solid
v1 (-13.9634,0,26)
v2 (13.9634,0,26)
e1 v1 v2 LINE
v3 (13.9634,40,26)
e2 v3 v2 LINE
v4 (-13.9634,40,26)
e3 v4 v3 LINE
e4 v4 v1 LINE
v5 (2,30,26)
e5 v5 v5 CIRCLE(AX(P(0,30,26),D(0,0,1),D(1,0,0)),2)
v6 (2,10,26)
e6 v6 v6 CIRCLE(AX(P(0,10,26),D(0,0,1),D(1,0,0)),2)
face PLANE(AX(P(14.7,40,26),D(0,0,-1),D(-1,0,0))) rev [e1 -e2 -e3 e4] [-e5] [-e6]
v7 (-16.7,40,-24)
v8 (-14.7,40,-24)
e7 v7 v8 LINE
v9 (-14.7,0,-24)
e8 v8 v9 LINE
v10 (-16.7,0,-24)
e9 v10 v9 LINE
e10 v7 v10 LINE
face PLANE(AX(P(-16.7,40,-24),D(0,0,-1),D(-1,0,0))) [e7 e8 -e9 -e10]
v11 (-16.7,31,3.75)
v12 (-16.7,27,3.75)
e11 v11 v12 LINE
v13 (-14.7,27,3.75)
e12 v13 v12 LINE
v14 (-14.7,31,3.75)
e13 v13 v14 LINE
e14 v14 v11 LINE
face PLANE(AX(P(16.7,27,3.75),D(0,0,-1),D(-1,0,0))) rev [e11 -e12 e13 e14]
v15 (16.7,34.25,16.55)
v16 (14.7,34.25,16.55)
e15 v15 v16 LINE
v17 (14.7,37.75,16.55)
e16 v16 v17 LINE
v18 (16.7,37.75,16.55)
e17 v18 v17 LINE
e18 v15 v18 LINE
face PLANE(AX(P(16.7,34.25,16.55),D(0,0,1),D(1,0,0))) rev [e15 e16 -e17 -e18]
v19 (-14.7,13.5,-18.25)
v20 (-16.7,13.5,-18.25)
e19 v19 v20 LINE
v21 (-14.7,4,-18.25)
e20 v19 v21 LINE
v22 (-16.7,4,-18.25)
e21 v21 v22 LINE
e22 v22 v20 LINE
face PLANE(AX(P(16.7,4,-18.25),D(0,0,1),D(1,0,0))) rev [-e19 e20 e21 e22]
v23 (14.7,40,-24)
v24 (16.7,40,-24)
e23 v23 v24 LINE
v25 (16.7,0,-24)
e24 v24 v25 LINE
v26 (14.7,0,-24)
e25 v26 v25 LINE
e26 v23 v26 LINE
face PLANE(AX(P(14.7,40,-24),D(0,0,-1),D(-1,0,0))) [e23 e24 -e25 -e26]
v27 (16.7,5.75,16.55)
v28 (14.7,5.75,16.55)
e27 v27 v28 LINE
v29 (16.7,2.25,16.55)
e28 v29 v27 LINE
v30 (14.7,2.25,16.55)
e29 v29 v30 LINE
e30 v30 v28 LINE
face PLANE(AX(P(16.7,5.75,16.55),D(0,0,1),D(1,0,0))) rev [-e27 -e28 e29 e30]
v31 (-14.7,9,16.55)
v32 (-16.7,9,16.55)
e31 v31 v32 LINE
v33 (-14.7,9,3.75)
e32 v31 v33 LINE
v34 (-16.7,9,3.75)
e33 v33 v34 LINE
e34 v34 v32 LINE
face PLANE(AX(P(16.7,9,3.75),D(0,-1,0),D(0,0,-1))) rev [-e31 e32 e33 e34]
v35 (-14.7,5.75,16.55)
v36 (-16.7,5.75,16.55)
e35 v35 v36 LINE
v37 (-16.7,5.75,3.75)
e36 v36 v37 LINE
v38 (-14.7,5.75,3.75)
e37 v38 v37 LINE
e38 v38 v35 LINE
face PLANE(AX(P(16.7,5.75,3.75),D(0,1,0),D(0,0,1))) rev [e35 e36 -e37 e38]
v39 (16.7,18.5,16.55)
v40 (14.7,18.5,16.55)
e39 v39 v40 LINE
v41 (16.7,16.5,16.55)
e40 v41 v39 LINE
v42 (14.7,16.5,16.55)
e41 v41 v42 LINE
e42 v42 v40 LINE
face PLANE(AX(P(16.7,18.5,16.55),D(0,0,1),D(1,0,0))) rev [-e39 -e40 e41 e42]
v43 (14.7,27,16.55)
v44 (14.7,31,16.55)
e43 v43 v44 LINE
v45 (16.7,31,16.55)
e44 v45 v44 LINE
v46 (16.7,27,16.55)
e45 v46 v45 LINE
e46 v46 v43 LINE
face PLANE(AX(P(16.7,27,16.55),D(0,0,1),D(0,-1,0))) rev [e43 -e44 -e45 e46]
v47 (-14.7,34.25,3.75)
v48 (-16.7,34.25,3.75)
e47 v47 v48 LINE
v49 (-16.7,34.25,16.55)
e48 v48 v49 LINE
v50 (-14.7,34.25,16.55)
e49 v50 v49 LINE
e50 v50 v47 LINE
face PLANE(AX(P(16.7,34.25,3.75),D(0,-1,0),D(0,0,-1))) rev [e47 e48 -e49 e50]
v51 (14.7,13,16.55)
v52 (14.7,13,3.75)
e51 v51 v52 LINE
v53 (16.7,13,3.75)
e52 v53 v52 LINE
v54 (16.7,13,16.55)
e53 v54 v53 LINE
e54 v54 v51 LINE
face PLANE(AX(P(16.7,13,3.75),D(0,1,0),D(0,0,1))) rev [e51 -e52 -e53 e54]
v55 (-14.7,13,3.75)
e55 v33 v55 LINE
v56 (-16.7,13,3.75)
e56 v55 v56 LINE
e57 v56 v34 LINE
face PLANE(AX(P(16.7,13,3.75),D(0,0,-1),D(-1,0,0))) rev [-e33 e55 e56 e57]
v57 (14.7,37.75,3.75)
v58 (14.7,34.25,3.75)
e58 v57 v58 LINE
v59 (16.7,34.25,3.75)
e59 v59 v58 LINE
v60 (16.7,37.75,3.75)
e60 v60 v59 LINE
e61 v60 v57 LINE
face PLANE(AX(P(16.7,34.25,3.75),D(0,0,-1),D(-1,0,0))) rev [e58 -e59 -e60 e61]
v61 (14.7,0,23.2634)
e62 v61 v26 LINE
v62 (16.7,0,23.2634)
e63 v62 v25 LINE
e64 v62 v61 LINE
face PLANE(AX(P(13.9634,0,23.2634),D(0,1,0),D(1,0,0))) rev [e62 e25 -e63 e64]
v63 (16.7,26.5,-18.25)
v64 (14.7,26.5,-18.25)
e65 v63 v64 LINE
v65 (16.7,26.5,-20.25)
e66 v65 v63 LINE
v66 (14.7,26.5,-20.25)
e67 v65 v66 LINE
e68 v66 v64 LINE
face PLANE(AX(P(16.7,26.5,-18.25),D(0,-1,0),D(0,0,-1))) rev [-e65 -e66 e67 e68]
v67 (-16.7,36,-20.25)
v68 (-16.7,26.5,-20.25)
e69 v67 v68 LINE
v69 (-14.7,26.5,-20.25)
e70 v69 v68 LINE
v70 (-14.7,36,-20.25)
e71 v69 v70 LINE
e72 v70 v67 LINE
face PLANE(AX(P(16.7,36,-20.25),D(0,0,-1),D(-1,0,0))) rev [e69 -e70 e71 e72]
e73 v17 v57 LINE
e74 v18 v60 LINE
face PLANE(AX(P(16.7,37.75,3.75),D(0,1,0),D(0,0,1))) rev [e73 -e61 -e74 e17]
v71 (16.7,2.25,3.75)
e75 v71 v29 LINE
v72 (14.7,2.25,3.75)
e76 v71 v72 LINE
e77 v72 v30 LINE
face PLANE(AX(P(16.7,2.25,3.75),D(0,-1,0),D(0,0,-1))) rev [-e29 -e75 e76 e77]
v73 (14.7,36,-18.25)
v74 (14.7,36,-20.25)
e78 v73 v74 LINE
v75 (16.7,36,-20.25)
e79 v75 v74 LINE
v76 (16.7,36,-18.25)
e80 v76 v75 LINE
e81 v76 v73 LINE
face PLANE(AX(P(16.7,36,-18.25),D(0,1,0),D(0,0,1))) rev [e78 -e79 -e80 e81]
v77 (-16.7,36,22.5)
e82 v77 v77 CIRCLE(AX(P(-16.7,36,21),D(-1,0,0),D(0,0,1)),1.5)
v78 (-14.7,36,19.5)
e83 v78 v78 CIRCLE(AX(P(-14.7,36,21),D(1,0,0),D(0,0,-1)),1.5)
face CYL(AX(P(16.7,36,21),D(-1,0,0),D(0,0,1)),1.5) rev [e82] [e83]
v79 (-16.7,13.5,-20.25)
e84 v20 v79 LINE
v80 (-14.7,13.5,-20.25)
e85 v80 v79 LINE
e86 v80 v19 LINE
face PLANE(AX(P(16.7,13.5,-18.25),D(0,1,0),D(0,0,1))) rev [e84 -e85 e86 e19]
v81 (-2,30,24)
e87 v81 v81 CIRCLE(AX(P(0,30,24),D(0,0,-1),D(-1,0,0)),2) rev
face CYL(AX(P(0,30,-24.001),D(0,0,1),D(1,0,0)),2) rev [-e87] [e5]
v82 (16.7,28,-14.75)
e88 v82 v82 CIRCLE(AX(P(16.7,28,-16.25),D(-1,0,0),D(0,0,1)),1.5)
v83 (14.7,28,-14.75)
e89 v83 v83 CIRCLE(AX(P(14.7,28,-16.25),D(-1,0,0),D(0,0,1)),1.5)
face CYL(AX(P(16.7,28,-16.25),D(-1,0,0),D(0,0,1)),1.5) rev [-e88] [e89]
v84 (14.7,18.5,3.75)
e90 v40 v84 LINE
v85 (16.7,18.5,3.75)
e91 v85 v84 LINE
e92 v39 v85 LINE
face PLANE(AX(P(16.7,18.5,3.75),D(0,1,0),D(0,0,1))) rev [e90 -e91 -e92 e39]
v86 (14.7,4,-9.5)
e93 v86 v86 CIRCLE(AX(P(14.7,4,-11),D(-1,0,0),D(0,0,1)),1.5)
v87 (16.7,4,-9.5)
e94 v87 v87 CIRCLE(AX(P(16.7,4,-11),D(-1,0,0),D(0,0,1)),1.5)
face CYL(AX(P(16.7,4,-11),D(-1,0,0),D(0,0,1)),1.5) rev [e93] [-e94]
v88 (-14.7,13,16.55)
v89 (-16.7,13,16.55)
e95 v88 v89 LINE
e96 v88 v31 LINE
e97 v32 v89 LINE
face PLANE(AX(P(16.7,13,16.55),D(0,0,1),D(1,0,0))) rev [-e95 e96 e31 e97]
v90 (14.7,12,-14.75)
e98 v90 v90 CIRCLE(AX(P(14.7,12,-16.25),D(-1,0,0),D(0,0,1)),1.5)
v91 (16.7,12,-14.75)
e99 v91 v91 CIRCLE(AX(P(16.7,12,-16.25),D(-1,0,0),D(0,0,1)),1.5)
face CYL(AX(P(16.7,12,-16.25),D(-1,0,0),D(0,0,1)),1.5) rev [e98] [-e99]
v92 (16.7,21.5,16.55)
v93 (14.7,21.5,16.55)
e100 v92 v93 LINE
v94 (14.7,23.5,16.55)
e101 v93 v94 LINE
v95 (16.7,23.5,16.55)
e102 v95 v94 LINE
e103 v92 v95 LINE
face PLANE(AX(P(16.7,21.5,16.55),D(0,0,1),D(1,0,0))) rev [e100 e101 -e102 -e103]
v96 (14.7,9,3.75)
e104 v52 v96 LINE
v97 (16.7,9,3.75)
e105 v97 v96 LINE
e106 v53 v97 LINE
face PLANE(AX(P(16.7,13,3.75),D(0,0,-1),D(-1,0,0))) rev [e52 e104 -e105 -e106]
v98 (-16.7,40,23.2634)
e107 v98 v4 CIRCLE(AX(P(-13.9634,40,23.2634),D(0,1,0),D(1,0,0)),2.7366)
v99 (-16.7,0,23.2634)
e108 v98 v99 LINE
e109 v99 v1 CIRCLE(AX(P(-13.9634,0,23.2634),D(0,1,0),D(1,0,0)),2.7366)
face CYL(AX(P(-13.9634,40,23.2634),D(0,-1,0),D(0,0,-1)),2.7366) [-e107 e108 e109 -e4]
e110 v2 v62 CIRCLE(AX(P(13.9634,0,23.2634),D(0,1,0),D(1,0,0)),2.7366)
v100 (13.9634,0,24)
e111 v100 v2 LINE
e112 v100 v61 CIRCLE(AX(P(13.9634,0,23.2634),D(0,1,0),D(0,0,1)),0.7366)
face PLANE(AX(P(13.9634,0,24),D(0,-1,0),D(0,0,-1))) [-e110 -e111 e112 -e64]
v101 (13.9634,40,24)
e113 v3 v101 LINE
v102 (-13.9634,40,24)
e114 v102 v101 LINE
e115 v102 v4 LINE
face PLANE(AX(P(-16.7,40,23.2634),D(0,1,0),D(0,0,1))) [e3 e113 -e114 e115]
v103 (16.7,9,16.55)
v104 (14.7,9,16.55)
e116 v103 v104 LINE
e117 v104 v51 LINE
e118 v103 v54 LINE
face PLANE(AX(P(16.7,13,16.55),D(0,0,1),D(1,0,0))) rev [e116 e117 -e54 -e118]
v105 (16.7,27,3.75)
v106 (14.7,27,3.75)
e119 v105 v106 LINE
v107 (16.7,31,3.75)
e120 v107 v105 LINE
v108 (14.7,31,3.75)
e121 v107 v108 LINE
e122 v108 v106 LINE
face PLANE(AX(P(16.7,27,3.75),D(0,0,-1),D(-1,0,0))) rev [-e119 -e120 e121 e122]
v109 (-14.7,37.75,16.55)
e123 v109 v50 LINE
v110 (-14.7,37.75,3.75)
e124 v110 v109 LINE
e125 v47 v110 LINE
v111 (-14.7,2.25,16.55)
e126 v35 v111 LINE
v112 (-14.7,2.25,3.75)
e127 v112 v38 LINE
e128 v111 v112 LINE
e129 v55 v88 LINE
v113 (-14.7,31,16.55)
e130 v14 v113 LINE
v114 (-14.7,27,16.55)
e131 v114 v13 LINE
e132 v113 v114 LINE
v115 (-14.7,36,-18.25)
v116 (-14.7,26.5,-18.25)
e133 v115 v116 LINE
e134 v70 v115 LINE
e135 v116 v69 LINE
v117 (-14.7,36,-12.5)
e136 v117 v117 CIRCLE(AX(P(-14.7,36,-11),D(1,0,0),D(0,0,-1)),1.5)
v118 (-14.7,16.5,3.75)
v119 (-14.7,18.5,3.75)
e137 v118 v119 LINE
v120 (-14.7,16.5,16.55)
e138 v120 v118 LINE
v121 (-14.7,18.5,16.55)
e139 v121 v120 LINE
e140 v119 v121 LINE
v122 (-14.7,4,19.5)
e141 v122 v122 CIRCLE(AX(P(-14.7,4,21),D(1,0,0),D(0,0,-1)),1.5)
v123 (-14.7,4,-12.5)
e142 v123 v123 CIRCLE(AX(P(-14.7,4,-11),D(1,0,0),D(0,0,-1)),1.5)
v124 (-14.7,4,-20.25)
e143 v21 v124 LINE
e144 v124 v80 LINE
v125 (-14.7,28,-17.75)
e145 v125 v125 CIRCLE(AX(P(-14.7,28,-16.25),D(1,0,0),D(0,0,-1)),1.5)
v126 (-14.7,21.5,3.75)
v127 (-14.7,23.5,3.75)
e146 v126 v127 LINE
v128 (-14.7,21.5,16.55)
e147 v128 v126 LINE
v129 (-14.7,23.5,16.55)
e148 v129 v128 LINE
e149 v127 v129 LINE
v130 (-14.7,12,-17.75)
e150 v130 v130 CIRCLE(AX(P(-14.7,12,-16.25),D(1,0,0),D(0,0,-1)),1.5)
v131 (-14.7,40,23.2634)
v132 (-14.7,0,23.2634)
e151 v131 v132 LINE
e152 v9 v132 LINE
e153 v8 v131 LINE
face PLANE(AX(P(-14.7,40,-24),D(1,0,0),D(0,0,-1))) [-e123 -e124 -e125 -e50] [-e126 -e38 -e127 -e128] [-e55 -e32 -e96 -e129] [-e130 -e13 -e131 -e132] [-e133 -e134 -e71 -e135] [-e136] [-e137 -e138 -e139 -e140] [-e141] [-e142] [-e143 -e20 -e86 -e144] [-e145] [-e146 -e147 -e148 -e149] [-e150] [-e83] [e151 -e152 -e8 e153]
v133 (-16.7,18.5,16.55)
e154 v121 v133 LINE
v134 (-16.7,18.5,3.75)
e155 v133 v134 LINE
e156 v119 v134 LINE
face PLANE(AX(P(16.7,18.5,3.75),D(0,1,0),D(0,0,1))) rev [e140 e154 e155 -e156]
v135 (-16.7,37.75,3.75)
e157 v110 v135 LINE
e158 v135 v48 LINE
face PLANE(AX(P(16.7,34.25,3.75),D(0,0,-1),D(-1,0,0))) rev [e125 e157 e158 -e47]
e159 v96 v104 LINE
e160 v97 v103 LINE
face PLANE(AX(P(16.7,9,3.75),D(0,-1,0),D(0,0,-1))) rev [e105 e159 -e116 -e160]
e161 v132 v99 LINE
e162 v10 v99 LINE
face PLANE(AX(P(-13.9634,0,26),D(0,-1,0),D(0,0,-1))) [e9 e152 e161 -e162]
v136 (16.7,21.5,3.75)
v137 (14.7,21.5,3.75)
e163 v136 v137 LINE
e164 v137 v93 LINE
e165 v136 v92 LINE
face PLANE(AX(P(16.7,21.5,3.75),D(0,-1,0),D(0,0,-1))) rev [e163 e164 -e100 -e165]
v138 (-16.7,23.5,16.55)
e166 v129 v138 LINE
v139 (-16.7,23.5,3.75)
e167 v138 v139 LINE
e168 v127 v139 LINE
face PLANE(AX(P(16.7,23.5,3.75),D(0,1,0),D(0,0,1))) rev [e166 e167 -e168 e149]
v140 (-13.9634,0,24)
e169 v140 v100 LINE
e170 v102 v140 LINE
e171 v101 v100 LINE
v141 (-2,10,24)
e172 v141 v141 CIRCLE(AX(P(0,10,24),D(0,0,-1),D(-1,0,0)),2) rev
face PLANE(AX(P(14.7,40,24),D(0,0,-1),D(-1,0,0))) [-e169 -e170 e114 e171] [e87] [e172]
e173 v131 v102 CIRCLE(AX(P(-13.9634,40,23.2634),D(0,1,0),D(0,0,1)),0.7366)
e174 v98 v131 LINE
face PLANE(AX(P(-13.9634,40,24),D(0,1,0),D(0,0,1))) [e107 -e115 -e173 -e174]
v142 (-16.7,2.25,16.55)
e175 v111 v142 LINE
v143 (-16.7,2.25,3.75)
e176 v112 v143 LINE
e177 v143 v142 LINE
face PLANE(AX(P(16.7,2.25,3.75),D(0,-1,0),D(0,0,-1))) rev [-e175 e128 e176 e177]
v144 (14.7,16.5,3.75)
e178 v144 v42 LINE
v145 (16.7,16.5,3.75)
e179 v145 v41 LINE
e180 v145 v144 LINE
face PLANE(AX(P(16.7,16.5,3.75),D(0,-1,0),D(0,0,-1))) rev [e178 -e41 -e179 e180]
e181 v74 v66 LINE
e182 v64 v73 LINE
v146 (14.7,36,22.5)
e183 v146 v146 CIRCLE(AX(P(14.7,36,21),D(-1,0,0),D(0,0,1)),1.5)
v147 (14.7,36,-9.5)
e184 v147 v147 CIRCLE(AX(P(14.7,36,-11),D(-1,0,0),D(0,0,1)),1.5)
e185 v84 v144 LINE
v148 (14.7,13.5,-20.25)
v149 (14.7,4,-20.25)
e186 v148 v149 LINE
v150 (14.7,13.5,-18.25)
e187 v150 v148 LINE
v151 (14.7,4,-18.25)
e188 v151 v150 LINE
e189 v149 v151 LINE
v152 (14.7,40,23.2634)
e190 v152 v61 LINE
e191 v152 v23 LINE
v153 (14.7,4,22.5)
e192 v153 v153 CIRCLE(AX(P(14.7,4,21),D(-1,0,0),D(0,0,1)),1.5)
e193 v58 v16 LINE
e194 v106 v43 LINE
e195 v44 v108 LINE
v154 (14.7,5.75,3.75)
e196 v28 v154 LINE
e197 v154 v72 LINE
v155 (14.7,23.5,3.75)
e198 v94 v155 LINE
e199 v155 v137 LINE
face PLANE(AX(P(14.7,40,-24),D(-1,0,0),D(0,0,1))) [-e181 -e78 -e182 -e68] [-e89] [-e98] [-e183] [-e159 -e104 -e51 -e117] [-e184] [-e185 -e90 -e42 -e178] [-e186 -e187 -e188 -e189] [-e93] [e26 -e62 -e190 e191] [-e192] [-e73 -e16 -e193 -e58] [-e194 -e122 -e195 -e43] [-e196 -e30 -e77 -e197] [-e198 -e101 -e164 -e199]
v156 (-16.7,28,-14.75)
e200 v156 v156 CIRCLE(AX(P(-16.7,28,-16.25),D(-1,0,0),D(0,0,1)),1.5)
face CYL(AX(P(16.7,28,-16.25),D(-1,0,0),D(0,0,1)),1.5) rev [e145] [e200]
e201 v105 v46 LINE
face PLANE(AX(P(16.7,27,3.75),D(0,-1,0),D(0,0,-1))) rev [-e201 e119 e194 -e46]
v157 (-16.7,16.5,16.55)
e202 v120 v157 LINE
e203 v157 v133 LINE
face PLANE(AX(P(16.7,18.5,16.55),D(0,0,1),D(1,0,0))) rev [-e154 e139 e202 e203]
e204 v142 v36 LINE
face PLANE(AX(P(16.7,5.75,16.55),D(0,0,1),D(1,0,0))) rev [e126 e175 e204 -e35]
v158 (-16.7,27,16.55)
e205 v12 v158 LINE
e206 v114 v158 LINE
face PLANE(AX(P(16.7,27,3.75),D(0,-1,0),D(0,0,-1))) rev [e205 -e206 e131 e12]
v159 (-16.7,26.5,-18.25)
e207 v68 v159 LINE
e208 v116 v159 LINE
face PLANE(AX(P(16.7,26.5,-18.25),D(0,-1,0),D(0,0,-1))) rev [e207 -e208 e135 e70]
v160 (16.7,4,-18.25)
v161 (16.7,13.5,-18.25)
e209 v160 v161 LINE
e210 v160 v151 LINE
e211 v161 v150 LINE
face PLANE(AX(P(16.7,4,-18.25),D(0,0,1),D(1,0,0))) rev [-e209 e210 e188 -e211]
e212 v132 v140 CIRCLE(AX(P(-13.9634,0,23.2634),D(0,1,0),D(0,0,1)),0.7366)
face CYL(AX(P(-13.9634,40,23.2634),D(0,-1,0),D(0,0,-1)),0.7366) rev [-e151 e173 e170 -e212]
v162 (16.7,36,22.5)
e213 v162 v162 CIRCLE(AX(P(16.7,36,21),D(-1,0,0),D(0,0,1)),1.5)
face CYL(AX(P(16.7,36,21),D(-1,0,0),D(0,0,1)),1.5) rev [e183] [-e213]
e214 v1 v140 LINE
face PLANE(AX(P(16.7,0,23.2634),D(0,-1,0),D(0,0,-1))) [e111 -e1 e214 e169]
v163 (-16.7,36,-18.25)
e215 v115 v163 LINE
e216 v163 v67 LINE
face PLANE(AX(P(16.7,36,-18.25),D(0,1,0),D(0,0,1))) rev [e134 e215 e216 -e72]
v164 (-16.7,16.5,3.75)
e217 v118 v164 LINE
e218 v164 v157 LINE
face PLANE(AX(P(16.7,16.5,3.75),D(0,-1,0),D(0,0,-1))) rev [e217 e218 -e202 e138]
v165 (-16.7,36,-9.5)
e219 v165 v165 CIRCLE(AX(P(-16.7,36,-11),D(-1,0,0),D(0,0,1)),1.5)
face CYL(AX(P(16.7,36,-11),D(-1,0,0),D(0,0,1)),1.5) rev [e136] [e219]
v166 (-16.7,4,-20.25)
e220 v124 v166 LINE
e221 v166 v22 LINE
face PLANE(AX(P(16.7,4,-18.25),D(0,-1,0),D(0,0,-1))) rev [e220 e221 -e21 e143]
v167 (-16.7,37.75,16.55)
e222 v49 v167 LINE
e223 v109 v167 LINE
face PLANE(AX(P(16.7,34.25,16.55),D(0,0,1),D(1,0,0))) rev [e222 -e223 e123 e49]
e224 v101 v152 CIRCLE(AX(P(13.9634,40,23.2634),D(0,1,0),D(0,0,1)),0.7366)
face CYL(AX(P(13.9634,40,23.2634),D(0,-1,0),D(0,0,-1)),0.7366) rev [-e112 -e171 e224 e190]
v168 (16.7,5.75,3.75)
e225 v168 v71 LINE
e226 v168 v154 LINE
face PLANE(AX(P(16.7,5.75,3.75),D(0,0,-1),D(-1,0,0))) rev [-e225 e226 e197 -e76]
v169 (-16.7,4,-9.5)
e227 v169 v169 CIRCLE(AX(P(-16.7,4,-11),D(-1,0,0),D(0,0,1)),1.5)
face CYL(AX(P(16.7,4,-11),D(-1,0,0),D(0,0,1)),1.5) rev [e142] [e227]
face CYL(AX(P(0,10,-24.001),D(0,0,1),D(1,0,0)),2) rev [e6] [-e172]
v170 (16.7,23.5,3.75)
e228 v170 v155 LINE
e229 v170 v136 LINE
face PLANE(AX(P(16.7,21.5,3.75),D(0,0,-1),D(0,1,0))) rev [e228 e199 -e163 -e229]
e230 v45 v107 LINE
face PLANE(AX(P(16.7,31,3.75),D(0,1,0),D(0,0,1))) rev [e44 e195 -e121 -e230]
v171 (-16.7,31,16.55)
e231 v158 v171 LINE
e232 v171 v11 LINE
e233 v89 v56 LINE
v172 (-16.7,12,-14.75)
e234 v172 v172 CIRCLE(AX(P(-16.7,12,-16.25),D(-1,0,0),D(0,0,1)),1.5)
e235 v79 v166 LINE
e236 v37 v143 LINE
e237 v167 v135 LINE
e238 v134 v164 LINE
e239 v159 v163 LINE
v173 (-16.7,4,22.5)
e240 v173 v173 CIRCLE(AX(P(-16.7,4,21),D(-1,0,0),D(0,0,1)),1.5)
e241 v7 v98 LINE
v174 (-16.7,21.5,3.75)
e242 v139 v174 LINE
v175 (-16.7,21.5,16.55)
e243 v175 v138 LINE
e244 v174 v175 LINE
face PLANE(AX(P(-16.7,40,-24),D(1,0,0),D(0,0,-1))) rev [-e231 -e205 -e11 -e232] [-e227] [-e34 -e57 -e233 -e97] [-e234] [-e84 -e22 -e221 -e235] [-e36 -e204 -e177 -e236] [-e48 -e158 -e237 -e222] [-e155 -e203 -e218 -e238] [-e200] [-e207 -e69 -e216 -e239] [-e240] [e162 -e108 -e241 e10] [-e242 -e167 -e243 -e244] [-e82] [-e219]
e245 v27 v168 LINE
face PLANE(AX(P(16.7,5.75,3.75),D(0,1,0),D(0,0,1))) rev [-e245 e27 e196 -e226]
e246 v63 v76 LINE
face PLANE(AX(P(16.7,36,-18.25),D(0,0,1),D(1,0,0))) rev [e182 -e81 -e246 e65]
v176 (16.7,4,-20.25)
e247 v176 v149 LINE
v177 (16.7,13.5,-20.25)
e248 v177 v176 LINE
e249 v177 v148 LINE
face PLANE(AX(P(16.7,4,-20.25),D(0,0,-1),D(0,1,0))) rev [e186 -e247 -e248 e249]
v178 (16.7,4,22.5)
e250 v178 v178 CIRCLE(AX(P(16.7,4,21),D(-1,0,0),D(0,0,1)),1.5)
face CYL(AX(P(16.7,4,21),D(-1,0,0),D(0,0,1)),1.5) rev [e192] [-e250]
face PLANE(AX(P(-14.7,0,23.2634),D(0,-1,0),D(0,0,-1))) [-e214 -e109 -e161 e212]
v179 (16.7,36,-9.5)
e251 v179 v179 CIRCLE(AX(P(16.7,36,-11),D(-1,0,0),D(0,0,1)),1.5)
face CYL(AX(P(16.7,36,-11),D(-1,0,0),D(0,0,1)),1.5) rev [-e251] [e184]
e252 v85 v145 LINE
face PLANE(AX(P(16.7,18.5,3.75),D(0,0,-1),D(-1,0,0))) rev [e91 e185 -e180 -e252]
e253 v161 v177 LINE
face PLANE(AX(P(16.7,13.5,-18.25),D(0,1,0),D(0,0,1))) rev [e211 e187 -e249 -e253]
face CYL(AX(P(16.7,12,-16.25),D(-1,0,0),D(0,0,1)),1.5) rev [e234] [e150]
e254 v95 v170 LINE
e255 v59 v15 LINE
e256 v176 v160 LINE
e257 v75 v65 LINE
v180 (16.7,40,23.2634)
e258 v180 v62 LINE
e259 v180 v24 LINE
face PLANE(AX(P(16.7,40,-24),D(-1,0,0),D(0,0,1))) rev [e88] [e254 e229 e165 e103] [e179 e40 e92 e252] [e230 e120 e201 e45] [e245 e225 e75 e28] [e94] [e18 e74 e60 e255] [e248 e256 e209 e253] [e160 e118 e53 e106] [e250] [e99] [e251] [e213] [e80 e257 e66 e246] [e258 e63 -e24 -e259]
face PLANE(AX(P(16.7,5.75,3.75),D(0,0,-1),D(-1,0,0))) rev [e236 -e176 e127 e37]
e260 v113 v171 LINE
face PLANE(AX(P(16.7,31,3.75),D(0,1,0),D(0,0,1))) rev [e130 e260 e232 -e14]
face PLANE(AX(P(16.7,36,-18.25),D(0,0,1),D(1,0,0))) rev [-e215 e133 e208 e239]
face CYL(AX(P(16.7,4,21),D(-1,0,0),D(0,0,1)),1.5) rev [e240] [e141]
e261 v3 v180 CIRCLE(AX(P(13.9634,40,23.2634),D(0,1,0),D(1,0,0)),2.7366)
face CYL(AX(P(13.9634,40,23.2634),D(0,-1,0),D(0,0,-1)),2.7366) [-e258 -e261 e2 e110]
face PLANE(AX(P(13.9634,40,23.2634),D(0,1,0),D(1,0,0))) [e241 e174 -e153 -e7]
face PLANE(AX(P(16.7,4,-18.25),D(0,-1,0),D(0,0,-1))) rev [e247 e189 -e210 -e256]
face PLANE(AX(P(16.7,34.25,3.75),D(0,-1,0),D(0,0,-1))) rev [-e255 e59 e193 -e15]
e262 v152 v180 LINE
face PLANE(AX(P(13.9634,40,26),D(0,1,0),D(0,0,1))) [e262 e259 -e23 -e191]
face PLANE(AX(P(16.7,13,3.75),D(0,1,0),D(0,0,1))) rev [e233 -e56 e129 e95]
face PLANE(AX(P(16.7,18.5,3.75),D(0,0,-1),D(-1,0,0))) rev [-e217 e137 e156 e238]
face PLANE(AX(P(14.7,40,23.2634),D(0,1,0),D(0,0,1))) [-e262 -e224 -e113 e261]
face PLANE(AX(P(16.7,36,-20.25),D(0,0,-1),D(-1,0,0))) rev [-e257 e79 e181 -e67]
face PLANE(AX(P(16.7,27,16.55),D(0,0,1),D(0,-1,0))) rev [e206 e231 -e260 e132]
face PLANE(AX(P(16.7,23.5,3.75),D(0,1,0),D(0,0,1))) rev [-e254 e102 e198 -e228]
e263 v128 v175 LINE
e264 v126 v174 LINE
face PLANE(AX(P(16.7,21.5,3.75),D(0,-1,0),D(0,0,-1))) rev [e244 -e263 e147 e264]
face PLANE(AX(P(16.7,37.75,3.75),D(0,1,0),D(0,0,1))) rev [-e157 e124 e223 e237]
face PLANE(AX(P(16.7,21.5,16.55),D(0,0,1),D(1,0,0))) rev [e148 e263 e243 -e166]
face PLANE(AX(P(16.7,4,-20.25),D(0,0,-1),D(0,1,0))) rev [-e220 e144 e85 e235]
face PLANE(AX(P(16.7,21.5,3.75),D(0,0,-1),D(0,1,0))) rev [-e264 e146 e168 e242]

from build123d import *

# Parameters (mm, degrees)
BASE_FLANGE1_DEPTH = 40
SKETCH2_R          = 1.5
SKETCH2_W          = 12.8
SKETCH2_H          = 3.5
SKETCH2_H_2        = 2
SKETCH2_H_3        = 4
SKETCH2_W_2        = 2
SKETCH2_H_4        = 9.5
CUT_EXTRUDE1_DEPTH = 33.4
CUT_EXTRUDE2_REACH = 68.173
SKETCH4_R          = 2


# Sheet-metal steps are written as plain solids
with BuildPart() as part:
    # Sketch1 → Base-Flange1 (new body)
    with BuildSketch(Plane(origin=(0, 0, 0), x_dir=(1, 0, 0), z_dir=(0, 1, 0))):
        with BuildLine():
            Line((14.7, 24), (14.7, -23.2634))
            ThreePointArc((14.7, -23.2634), (14.484254855, -23.784254855), (13.9634, -24))
            Line((13.9634, -24), (-13.9634, -24))
            ThreePointArc((-13.9634, -24), (-14.484254855, -23.784254855), (-14.7, -23.2634))
            Line((-14.7, -23.2634), (-14.7, 24))
            Line((-14.7, 24), (-16.7, 24))
            Line((-16.7, 24), (-16.7, -23.2634))
            ThreePointArc((-16.7, -23.2634), (-15.898468417, -25.198468417), (-13.9634, -26))
            Line((-13.9634, -26), (13.9634, -26))
            ThreePointArc((13.9634, -26), (15.898468417, -25.198468417), (16.7, -23.2634))
            Line((16.7, -23.2634), (16.7, 24))
            Line((16.7, 24), (14.7, 24))
        make_face()
    extrude(amount=BASE_FLANGE1_DEPTH)

    # Sketch2 → Cut-Extrude1 (cut)
    with BuildSketch(Plane.ZY.offset(16.7)):
        with Locations((-16.25, 12)):
            Circle(SKETCH2_R)
        with Locations((-16.25, 28)):
            Circle(SKETCH2_R)
        with Locations((21, 4)):
            Circle(SKETCH2_R)
        with Locations((21, 36)):
            Circle(SKETCH2_R)
        with Locations((-11, 4)):
            Circle(SKETCH2_R)
        with Locations((-11, 36)):
            Circle(SKETCH2_R)
        with Locations((10.15, 36)):
            Rectangle(SKETCH2_W, SKETCH2_H)
        with Locations((10.15, 17.5)):
            Rectangle(SKETCH2_W, SKETCH2_H_2)
        with Locations((10.15, 11)):
            Rectangle(SKETCH2_W, SKETCH2_H_3)
        with Locations((10.15, 29)):
            Rectangle(SKETCH2_W, SKETCH2_H_3)
        with Locations((10.15, 4)):
            Rectangle(SKETCH2_W, SKETCH2_H)
        with Locations((10.15, 22.5)):
            Rectangle(SKETCH2_W, SKETCH2_H_2)
        with Locations((-19.25, 8.75)):
            Rectangle(SKETCH2_W_2, SKETCH2_H_4)
        with Locations((-19.25, 31.25)):
            Rectangle(SKETCH2_W_2, SKETCH2_H_4)
    extrude(amount=-CUT_EXTRUDE1_DEPTH, mode=Mode.SUBTRACT)

    # Sketch4 → Cut-Extrude2 (cut, up to next)
    with BuildSketch(Plane.XY.offset(26), mode=Mode.PRIVATE) as cut_extrude2_sk1:
        with Locations((0, 10)):
            Circle(SKETCH4_R)
    cut_extrude2_tool1 = extrude(cut_extrude2_sk1.sketch, amount=-CUT_EXTRUDE2_REACH, mode=Mode.PRIVATE) & part.part
    # Sketch4 → Cut-Extrude2 (cut, up to next)
    with BuildSketch(Plane.XY.offset(26), mode=Mode.PRIVATE) as cut_extrude2_sk2:
        with Locations((0, 30)):
            Circle(SKETCH4_R)
    cut_extrude2_tool2 = extrude(cut_extrude2_sk2.sketch, amount=-CUT_EXTRUDE2_REACH, mode=Mode.PRIVATE) & part.part
    add(cut_extrude2_tool1.solids().sort_by_distance((0, 10, 26))[0], mode=Mode.SUBTRACT)
    add(cut_extrude2_tool2.solids().sort_by_distance((0, 30, 26))[0], mode=Mode.SUBTRACT)


solid = part.part
